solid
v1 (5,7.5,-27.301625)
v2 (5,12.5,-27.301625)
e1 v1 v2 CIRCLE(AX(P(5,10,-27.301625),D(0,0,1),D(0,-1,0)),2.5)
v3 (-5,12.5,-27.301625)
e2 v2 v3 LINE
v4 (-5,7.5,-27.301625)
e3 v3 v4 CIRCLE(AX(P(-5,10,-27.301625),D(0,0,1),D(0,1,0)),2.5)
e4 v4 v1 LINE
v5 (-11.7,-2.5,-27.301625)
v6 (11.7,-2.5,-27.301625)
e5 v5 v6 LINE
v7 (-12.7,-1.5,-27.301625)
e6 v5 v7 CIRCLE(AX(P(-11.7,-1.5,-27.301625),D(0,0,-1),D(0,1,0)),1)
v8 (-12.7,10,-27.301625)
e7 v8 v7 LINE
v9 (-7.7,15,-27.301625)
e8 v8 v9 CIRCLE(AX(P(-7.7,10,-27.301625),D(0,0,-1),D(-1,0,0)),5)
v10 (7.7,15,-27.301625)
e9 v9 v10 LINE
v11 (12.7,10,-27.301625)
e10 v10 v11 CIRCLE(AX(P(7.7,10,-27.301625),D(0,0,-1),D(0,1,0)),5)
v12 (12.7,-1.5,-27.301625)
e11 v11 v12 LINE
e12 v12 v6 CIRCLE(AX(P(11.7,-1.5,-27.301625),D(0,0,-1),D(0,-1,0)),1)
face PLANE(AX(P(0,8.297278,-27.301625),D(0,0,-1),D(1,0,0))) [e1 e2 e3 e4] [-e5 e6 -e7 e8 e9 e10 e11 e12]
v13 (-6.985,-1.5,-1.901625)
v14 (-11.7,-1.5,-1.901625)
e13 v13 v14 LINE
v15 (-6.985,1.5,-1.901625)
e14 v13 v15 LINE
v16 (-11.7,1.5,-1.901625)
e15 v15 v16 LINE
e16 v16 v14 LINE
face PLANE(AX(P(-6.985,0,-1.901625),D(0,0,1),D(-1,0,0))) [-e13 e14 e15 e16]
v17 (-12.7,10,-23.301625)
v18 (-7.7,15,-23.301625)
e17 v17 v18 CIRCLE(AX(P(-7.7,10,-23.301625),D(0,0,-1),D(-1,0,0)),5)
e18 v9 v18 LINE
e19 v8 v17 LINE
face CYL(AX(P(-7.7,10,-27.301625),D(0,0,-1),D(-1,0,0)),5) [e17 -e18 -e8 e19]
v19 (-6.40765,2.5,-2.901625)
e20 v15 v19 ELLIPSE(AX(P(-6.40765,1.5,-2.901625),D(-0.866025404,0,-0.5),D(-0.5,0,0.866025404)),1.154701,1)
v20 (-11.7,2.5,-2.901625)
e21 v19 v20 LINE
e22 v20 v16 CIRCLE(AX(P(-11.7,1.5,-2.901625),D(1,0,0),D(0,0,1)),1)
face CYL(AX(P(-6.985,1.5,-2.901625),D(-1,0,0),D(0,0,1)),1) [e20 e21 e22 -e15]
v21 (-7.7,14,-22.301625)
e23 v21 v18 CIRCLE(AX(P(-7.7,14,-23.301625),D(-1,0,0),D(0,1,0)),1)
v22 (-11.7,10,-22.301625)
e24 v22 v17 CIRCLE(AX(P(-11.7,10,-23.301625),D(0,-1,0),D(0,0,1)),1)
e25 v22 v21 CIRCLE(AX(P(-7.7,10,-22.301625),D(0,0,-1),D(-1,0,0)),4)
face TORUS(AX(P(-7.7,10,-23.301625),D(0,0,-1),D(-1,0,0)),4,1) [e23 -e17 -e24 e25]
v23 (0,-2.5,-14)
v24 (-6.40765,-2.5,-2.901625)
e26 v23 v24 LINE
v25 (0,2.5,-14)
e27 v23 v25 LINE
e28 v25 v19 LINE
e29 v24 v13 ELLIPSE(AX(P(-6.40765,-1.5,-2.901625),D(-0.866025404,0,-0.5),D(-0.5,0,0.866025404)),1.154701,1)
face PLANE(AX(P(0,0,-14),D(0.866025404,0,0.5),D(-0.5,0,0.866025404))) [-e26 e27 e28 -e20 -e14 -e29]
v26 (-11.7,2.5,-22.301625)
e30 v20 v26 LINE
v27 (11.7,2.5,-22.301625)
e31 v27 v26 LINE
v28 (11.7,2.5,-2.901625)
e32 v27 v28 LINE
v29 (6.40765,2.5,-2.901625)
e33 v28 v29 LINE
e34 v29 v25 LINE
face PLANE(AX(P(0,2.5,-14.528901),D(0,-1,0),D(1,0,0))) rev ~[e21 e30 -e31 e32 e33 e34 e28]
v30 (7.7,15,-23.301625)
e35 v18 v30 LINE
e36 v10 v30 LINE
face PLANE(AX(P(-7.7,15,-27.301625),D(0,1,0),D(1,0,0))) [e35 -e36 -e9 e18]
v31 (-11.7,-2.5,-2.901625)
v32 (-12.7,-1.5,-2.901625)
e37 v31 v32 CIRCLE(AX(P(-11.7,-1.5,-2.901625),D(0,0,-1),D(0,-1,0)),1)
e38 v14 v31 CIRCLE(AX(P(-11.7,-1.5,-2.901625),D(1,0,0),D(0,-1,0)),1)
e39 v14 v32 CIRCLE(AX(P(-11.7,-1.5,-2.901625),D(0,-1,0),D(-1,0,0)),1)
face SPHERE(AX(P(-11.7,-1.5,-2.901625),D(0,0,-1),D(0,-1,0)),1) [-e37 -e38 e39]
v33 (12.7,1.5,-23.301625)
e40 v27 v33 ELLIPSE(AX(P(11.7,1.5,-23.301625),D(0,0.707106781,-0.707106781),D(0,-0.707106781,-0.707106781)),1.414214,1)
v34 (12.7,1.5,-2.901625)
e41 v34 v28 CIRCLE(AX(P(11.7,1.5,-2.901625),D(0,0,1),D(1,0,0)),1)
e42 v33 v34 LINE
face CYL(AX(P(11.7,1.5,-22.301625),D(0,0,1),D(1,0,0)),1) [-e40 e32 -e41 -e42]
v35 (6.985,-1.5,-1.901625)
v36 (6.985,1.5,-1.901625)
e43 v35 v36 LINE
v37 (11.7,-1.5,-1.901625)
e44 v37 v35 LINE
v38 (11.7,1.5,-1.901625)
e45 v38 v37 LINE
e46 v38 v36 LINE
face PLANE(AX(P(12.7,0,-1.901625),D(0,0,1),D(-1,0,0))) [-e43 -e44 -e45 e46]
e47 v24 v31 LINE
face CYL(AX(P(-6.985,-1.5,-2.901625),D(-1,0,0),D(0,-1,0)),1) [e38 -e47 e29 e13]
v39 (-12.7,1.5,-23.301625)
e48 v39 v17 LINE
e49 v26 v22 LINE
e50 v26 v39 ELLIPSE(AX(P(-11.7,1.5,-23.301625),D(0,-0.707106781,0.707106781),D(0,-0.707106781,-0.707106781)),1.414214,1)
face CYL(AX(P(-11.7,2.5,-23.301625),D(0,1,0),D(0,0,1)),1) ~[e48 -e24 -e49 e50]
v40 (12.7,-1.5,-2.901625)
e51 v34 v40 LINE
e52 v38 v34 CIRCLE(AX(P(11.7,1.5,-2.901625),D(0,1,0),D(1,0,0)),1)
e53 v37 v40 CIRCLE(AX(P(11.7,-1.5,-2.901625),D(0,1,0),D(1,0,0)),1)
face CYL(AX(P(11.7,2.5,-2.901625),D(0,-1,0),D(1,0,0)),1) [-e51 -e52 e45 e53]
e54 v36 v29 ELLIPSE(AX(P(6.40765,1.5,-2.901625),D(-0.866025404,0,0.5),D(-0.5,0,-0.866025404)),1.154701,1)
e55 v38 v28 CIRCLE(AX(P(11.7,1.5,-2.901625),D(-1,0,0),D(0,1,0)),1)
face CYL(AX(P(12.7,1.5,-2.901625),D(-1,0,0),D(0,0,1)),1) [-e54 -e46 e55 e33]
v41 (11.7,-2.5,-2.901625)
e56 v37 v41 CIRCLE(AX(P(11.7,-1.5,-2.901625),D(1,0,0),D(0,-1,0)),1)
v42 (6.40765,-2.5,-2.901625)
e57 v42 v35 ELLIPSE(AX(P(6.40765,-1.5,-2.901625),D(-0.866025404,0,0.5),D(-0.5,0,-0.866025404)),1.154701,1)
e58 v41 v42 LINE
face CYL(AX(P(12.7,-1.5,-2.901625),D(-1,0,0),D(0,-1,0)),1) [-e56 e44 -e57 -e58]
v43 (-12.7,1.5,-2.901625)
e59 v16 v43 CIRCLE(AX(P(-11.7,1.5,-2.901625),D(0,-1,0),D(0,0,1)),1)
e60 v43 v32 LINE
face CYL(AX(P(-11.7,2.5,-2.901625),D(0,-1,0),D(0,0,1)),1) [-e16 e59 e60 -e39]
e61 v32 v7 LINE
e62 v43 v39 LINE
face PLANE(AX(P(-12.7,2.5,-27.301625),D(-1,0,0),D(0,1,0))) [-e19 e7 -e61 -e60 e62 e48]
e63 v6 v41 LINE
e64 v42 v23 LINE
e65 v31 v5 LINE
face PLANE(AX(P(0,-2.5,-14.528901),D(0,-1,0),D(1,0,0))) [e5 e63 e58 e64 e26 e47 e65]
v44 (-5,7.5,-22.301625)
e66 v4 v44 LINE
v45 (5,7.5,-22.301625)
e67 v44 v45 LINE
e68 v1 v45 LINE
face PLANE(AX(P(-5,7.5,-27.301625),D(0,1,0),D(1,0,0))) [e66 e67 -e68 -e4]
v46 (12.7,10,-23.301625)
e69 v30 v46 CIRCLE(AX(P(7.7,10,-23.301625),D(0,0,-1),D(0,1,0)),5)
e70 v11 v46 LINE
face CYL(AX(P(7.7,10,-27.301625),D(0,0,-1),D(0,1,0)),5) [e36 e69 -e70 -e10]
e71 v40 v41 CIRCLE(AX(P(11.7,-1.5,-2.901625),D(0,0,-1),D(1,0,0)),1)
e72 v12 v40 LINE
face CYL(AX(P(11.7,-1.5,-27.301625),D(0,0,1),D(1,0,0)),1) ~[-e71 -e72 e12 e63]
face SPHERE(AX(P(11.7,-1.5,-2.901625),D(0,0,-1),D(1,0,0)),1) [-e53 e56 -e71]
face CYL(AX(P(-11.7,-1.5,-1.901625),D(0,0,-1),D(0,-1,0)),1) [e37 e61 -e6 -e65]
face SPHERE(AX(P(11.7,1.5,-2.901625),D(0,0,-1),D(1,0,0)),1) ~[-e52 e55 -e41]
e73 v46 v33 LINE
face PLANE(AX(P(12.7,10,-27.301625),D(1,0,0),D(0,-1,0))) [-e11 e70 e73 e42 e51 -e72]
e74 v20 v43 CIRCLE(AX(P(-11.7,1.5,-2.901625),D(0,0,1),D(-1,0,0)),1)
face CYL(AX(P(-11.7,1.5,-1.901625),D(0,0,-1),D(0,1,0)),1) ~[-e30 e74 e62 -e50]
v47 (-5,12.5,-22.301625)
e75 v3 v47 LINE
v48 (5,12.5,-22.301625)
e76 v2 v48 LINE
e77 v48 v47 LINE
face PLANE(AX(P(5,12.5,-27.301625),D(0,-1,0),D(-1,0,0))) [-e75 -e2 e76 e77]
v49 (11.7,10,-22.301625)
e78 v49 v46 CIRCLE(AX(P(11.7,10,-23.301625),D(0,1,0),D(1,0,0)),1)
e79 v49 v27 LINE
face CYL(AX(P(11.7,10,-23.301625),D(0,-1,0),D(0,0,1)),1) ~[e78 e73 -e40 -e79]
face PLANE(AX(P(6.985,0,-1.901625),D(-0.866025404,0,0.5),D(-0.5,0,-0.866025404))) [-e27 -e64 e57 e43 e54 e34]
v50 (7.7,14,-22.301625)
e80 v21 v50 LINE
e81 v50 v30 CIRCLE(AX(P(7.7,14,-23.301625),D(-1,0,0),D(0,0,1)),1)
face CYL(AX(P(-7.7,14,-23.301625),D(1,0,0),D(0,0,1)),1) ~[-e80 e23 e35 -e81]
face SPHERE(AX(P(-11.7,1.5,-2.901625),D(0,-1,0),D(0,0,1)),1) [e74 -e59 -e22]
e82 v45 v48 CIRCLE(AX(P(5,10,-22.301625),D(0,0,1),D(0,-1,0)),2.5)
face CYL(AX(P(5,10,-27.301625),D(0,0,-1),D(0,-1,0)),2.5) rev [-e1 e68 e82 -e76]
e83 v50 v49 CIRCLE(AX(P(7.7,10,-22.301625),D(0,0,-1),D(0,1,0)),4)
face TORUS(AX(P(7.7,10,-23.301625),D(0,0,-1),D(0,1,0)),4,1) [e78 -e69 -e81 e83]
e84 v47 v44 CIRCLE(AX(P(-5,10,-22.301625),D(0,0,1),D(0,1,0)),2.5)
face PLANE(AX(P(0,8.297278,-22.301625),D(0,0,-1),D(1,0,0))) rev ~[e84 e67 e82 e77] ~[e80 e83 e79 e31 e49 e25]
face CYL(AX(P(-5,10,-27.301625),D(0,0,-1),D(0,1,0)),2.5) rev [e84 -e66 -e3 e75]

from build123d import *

# Parameters (mm, degrees)
F1_DEPTH = 2.5
F3_DEPTH = 5
F4_R     = 1


# Not quite as in the source:
# - a feature names something its author has since deleted; it is built from what else it names


with BuildPart() as f1:
    # F0 (on Front) → F1 (new body, symmetric)
    with BuildSketch(Plane.XZ):
        Polygon((-6.985, -1.9016251091), (-12.7, -1.9016251091), (-12.7, -27.3016251091), (12.7, -27.3016251091), (12.7, -1.9016251091), (6.985, -1.9016251091), (0, -14), align=None)
    extrude(amount=F1_DEPTH, both=True)

    # F2 (on face) → F3 (join)
    with BuildSketch(Plane(origin=(0, 0, -27.3016251091), x_dir=(1, 0, 0), z_dir=(0, 0, -1))):
        with BuildLine():
            ThreePointArc((-12.7, -10), (-11.2355339059, -13.5355339059), (-7.7, -15))
            Line((-7.7, -15), (7.7, -15))
            ThreePointArc((7.7, -15), (11.2355339059, -13.5355339059), (12.7, -10))
            Line((12.7, -10), (12.7, -2.5))
            Line((12.7, -2.5), (-12.7, -2.5))
            Line((-12.7, -2.5), (-12.7, -10))
        make_face()
        with BuildLine():
            Line((-5, -7.5), (5, -7.5))
            ThreePointArc((5, -7.5), (7.5, -10), (5, -12.5))
            Line((5, -12.5), (-5, -12.5))
            ThreePointArc((-5, -12.5), (-7.5, -10), (-5, -7.5))
        make_face(mode=Mode.SUBTRACT)
    extrude(amount=-F3_DEPTH)

    # F4
    f4_edges = [f1.edges().sort_by_distance(p)[0] for p in [
        (-12.7, -2.5, -14.601625),
        (-9.8425, -2.5, -1.901625),
        (-12.7, 0, -1.901625),
        (-9.8425, 2.5, -1.901625),
        (-12.7, 2.5, -12.101625),
        (-12.7, 6.25, -22.301625),
        (12.7, 2.5, -12.101625),
        (12.7, -2.5, -14.601625),
        (12.7, 0, -1.901625),
        (9.8425, 2.5, -1.901625),
        (9.8425, -2.5, -1.901625),
    ]]
    fillet(f4_edges, radius=F4_R)


solid = f1.part
